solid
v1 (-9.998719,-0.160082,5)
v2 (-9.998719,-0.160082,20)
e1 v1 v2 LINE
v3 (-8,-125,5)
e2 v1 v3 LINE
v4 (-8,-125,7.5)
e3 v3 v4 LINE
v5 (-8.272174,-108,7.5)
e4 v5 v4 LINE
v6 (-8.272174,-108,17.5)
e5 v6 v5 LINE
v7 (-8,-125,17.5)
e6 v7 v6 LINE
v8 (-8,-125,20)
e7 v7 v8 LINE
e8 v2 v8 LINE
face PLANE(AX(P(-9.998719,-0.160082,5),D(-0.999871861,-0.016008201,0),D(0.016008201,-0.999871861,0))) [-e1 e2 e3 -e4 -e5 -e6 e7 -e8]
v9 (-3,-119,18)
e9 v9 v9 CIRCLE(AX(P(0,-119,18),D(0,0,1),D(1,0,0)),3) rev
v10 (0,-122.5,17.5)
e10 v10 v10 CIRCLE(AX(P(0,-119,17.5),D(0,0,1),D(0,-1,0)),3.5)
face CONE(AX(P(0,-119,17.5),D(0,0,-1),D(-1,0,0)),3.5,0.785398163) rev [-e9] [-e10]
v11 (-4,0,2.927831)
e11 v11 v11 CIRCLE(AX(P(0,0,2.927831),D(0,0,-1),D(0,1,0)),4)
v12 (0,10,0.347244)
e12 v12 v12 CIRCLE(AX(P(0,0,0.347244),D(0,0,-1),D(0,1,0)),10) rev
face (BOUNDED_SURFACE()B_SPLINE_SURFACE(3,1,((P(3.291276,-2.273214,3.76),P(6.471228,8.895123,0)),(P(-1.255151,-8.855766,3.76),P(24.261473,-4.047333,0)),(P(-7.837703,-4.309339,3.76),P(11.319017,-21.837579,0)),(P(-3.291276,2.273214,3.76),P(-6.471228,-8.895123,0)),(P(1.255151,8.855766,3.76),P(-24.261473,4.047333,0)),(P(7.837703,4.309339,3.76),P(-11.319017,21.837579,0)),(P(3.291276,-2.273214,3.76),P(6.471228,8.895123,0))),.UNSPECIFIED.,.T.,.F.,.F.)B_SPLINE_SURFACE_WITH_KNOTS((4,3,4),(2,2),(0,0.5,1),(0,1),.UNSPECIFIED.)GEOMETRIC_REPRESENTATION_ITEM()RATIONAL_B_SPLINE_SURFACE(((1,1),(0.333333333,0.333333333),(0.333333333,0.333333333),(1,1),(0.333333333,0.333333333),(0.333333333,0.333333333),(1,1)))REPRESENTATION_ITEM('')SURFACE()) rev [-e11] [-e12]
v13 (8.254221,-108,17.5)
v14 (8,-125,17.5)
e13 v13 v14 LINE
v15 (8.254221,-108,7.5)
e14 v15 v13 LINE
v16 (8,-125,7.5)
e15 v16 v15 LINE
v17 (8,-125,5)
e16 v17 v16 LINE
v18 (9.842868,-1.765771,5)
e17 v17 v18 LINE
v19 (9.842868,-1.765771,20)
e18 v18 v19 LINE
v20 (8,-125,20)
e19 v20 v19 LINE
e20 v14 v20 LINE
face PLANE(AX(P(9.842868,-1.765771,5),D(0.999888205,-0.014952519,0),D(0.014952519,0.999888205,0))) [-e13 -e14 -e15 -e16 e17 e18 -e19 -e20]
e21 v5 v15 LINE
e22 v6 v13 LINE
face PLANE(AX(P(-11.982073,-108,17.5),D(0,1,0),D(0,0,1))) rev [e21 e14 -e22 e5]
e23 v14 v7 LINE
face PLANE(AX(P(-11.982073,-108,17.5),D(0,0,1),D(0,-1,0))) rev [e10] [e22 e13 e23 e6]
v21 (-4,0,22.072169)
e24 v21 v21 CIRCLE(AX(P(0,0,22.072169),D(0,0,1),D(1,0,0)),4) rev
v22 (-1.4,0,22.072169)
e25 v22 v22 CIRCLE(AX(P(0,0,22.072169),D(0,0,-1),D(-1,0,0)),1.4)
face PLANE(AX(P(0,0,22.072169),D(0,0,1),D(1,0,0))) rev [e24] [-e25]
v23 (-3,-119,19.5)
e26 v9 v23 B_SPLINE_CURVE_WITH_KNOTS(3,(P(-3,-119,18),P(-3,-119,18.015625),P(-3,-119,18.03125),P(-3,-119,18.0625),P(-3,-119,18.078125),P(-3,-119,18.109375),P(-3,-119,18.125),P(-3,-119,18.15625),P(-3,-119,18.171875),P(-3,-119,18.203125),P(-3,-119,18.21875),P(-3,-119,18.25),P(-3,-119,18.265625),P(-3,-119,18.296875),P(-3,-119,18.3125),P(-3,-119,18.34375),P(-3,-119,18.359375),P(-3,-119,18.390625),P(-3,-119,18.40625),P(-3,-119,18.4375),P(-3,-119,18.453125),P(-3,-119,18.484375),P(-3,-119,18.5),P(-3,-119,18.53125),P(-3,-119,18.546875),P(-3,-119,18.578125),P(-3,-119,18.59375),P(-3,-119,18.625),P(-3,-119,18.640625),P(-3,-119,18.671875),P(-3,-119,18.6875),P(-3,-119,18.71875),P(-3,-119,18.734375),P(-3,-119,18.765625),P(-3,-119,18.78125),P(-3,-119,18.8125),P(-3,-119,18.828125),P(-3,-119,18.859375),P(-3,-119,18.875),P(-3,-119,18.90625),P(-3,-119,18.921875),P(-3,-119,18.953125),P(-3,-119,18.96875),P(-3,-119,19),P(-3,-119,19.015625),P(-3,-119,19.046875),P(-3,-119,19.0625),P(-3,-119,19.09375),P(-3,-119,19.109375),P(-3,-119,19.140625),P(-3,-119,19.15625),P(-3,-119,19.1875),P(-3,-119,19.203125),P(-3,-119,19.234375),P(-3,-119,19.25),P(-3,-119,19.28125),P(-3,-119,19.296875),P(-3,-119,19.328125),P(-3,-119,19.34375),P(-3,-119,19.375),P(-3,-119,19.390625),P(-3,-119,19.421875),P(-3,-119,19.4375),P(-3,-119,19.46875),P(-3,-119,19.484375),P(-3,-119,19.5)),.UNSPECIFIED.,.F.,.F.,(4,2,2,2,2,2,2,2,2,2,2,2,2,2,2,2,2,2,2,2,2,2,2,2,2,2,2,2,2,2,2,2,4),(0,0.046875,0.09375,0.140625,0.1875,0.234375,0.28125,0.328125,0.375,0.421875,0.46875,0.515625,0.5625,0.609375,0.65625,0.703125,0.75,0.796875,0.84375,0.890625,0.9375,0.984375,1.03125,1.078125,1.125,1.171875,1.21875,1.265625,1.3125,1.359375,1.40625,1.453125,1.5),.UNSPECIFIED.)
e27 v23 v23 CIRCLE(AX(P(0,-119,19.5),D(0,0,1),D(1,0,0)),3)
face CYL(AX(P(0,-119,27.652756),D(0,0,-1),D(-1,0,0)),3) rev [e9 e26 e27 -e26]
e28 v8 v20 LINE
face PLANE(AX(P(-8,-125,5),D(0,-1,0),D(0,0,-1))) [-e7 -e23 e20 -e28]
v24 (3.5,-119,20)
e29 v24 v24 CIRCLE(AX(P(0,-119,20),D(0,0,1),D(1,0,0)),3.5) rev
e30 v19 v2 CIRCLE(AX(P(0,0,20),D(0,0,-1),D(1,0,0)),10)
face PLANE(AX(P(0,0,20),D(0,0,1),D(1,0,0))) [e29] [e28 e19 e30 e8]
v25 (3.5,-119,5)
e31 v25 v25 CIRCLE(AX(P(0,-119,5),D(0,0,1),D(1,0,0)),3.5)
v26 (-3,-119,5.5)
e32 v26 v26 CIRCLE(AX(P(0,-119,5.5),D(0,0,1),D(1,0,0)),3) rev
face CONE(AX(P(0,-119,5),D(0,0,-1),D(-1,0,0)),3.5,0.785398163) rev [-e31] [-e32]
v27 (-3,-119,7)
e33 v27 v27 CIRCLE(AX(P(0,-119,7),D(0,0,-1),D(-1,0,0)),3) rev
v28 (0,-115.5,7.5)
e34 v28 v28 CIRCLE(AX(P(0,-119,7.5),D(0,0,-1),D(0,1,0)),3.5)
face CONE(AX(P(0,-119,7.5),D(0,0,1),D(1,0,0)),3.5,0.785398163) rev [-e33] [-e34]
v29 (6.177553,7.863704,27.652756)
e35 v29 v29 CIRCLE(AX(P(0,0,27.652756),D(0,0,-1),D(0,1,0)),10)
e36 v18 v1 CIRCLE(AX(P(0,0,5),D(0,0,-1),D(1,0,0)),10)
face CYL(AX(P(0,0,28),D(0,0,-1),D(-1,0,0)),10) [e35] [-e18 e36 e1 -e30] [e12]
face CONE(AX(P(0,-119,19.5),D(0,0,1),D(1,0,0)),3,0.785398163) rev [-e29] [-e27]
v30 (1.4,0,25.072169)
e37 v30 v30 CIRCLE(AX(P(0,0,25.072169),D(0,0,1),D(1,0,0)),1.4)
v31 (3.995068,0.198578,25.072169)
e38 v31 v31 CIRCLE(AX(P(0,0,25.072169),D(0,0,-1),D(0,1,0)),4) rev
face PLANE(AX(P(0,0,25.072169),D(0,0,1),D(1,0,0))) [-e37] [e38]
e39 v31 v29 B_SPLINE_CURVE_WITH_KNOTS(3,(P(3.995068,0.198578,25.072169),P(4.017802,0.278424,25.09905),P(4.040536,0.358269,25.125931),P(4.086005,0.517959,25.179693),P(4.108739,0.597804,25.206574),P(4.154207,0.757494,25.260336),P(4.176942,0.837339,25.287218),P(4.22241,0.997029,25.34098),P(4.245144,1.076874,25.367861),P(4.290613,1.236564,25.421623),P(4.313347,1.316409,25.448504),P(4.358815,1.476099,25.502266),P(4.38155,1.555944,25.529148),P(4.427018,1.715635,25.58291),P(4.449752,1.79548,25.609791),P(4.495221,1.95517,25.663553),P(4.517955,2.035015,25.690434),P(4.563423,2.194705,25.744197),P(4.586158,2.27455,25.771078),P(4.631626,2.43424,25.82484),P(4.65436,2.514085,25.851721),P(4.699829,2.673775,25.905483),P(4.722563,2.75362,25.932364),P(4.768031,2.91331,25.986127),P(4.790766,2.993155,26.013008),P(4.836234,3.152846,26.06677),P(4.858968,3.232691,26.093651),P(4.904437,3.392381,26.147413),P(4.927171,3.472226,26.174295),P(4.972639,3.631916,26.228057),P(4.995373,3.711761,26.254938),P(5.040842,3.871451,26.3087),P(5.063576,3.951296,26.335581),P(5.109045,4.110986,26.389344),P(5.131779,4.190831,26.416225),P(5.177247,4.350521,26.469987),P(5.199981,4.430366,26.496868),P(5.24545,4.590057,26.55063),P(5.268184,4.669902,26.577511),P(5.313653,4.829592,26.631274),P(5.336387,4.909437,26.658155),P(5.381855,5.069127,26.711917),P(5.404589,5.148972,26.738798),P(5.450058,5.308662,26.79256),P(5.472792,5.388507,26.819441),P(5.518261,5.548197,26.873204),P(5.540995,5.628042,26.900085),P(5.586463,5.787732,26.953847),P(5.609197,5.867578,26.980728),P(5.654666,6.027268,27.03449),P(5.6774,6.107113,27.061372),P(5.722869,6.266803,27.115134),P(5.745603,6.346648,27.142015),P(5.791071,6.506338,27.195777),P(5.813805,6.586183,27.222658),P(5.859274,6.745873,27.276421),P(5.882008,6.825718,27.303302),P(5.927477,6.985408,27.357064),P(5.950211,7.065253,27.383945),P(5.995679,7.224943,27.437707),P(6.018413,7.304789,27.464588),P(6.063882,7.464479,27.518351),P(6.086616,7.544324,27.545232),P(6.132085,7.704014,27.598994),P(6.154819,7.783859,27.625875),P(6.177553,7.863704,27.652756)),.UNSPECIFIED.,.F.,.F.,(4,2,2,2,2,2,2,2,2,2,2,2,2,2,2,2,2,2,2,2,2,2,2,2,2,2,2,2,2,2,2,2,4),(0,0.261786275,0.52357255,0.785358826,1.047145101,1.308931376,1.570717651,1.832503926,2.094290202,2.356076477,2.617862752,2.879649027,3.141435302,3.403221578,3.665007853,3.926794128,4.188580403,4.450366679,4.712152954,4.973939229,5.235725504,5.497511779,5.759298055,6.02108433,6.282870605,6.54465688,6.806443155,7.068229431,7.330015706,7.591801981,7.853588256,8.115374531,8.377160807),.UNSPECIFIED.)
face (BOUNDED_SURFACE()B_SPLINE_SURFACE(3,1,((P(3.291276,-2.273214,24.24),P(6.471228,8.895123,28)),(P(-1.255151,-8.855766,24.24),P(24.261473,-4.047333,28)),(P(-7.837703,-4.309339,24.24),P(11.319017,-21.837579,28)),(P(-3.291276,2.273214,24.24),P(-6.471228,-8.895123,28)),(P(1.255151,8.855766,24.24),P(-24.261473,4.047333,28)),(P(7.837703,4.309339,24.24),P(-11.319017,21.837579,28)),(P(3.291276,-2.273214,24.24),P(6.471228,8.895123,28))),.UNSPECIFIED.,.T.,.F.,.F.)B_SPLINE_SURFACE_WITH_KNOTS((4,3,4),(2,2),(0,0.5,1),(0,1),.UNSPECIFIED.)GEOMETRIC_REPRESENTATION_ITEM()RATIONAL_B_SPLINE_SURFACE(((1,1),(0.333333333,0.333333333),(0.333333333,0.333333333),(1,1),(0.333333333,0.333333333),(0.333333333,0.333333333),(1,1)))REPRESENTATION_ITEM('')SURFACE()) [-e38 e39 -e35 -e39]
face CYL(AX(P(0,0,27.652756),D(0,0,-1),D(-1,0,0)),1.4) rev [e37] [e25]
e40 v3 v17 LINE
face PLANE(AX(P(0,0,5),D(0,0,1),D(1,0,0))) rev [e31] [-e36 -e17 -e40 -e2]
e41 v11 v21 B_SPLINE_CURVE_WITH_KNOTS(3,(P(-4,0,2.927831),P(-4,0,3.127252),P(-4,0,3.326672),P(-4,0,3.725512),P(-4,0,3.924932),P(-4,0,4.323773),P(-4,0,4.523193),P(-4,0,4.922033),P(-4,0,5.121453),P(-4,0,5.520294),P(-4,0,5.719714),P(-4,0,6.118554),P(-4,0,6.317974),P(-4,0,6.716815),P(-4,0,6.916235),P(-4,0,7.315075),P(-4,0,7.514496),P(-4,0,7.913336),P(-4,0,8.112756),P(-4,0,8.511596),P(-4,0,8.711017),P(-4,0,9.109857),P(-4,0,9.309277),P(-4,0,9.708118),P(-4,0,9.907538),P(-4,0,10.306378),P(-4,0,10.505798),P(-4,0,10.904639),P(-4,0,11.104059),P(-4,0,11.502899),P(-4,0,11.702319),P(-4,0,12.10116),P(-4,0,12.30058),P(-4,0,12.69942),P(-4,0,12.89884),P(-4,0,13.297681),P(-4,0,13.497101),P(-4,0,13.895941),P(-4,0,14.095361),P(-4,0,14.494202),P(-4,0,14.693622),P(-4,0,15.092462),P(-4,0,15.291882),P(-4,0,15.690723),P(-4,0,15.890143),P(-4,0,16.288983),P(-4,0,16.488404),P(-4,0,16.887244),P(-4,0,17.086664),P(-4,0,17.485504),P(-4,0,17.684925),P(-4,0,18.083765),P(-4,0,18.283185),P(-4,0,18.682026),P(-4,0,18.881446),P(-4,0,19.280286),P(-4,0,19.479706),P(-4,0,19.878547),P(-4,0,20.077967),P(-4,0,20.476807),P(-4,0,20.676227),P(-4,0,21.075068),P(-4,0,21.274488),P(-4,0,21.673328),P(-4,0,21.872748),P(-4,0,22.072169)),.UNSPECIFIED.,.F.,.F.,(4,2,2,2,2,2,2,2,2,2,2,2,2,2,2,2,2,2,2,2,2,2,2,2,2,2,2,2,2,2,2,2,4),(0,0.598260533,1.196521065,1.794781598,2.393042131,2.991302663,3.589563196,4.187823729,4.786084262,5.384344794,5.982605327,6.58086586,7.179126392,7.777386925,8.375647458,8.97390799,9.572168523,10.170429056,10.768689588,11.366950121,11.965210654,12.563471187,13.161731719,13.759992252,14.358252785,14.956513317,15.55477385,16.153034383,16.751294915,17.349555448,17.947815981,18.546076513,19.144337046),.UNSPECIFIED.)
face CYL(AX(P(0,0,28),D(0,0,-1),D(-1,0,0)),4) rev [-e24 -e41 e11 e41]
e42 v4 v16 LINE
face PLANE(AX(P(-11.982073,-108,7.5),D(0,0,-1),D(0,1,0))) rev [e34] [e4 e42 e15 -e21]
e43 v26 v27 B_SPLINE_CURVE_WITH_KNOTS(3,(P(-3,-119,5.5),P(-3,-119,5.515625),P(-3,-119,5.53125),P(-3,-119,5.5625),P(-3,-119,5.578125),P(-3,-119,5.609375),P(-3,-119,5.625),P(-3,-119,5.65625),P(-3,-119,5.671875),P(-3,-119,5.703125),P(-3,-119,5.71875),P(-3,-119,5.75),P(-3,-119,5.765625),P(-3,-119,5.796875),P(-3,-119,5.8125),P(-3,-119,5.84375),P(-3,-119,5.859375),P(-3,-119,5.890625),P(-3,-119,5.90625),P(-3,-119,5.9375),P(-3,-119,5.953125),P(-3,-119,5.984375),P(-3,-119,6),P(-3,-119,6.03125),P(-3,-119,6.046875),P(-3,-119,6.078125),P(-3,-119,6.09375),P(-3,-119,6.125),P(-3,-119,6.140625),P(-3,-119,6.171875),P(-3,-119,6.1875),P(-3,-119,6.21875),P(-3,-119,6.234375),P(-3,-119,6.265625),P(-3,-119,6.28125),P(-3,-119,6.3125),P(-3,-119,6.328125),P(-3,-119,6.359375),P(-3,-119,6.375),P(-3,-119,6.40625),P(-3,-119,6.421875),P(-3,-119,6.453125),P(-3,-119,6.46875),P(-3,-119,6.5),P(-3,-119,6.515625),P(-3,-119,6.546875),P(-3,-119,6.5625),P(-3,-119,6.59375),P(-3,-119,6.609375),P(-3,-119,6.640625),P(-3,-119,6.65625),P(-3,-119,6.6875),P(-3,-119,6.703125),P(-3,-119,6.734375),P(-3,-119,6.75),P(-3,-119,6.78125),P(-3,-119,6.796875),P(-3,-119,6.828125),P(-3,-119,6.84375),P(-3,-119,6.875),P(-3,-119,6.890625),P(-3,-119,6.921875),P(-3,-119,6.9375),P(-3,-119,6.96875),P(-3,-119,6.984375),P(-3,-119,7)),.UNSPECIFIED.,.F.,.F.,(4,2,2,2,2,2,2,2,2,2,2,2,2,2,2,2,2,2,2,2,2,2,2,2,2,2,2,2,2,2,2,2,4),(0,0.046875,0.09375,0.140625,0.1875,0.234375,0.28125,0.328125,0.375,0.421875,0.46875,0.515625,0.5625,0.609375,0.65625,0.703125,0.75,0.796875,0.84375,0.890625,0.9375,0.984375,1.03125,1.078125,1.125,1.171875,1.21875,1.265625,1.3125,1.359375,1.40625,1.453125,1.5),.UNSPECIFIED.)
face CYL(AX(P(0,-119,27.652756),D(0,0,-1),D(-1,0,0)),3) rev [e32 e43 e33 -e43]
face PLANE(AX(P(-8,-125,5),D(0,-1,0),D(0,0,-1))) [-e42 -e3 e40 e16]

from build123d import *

# Parameters (mm, degrees)
SKETCH_1_R               = 10
EXTRUDE_1_DEPTH          = 28
EXTRUDE_START            = -15
EXTRUDE_2_DEPTH          = 15
CUT_EXTRUDE_2_DEPTH      = 128.720701533
CUT_EXTRUDE_2_DEPTH_BACK = 128.720701533
SKETCH_3_R               = 4
CUT_EXTRUDE_3_DEPTH      = 129.412129246
CUT_EXTRUDE_3_DEPTH_BACK = 129.412129246
SKETCH_7_W               = 10
SKETCH_7_H               = 22
CUT_EXTRUDE_4_DEPTH      = 128.428989534
CUT_EXTRUDE_4_DEPTH_BACK = 128.428989534
SKETCH_8_R               = 3
EXTRUDE_START_2          = -3
SKETCH_9_R               = 4
EXTRUDE_3_DEPTH          = 3
SKETCH_10_R              = 1.4
CUT_EXTRUDE_5_DEPTH      = 128.267326381
CHAMFER_1_SIZE           = 0.5


with BuildPart() as part:
    # 草图1 → 凸台-拉伸1 (new body)
    with BuildSketch(Plane.XY):
        Circle(SKETCH_1_R)
    extrude(amount=EXTRUDE_1_DEPTH)

    # 草图2 → 凸台-拉伸2 (add)
    with BuildSketch(Plane.XY.offset(20).offset(EXTRUDE_START)):
        with BuildLine():
            Line((-9.998718605, -0.160082009), (-8, -125))
            Line((-8, -125), (8, -125))
            Line((8, -125), (9.842868133, -1.765770913))
            ThreePointArc((9.842868133, -1.765770913), (-0.806617354, -9.967415334), (-9.998718605, -0.160082009))
        make_face()
    extrude(amount=EXTRUDE_2_DEPTH)

    # 草图3 → 切除-拉伸2 (cut, two sides: drawn at the far end of the back side and taken through both)
    with BuildSketch(Plane(origin=(0, 0, 3.76), x_dir=(-1, 0, 0), z_dir=(0, 0, -1)).offset(-CUT_EXTRUDE_2_DEPTH_BACK)):
        Circle(SKETCH_3_R)
    extrude(amount=CUT_EXTRUDE_2_DEPTH + CUT_EXTRUDE_2_DEPTH_BACK, mode=Mode.SUBTRACT)

    # 切除-放样2: read off the stored shape, not the designer's step
    # 切除-放样2: loft between two sections, ruled curve by curve
    loft_2_from = [
        Edge.make_bspline([(3.291276386, -2.27321353, 3.76), (-1.255150675, -8.855766301, 3.76), (-7.837703446, -4.309339241, 3.76), (-3.291276386, 2.27321353, 3.76), (1.255150675, 8.855766301, 3.76), (7.837703446, 4.309339241, 3.76), (3.291276386, -2.27321353, 3.76)], [0, 0, 0, 0, 0.5, 0.5, 0.5, 1, 1, 1, 1], 3, [1, 0.333333333, 0.333333333, 1, 0.333333333, 0.333333333, 1]),
    ]
    loft_2_to = [
        Edge.make_bspline([(6.471228023, 8.895122702, 0), (24.261473426, -4.047333344, 0), (11.319017381, -21.837578747, 0), (-6.471228023, -8.895122702, 0), (-24.261473426, 4.047333344, 0), (-11.319017381, 21.837578747, 0), (6.471228023, 8.895122702, 0)], [0, 0, 0, 0, 0.5, 0.5, 0.5, 1, 1, 1, 1], 3, [1, 0.333333333, 0.333333333, 1, 0.333333333, 0.333333333, 1]),
    ]
    loft_2 = Solid(Shell([*[Face.make_surface_from_curves(loft_2_from[k], loft_2_to[k]) for k in range(1)], Face(Wire(loft_2_from)), Face(Wire(loft_2_to))]))
    add(loft_2, mode=Mode.SUBTRACT)

    # 镜向1: 切除-放样2 across plane
    add(loft_2.mirror(Plane(origin=(0, 0, 14), x_dir=(1, 0, 0), z_dir=(0, 0, -1))), mode=Mode.SUBTRACT)

    # 草图7 → 切除-拉伸3 (cut, two sides: drawn at the far end of the back side and taken through both)
    with BuildSketch(Plane(origin=(0, 0, 0), x_dir=(0, 0, -1), z_dir=(1, 0, 0)).offset(-CUT_EXTRUDE_3_DEPTH_BACK)):
        with Locations((-12.5, -119)):
            Rectangle(SKETCH_7_W, SKETCH_7_H)
    extrude(amount=CUT_EXTRUDE_3_DEPTH + CUT_EXTRUDE_3_DEPTH_BACK, mode=Mode.SUBTRACT)

    # 草图8 → 切除-拉伸4 (cut, two sides: drawn at the far end of the back side and taken through both)
    with BuildSketch(Plane(origin=(0, 0, 5), x_dir=(-1, 0, 0), z_dir=(0, 0, -1)).offset(-CUT_EXTRUDE_4_DEPTH_BACK)):
        with Locations((0, -119)):
            Circle(SKETCH_8_R)
    extrude(amount=CUT_EXTRUDE_4_DEPTH + CUT_EXTRUDE_4_DEPTH_BACK, mode=Mode.SUBTRACT)

    # 草图9 → 凸台-拉伸3 (add)
    with BuildSketch(Plane.XY.offset(25.072168523).offset(EXTRUDE_START_2)):
        with Locations(Location((0, 0, 0), (0, 0, 180))):
            Circle(SKETCH_9_R)
    extrude(amount=EXTRUDE_3_DEPTH)

    # 草图10 → 切除-拉伸5 (cut, through all)
    with BuildSketch(Plane(origin=(0, 0, 22.072168523), x_dir=(-1, 0, 0), z_dir=(0, 0, -1))):
        Circle(SKETCH_10_R)
    extrude(amount=-CUT_EXTRUDE_5_DEPTH, mode=Mode.SUBTRACT)

    # 倒角1
    chamfer_1_edges = [part.edges().sort_by_distance(p)[0] for p in [
        (3, -119, 7.5),
        (3, -119, 5),
        (3, -119, 20),
        (3, -119, 17.5),
    ]]
    chamfer(chamfer_1_edges, length=CHAMFER_1_SIZE)


solid = part.part
